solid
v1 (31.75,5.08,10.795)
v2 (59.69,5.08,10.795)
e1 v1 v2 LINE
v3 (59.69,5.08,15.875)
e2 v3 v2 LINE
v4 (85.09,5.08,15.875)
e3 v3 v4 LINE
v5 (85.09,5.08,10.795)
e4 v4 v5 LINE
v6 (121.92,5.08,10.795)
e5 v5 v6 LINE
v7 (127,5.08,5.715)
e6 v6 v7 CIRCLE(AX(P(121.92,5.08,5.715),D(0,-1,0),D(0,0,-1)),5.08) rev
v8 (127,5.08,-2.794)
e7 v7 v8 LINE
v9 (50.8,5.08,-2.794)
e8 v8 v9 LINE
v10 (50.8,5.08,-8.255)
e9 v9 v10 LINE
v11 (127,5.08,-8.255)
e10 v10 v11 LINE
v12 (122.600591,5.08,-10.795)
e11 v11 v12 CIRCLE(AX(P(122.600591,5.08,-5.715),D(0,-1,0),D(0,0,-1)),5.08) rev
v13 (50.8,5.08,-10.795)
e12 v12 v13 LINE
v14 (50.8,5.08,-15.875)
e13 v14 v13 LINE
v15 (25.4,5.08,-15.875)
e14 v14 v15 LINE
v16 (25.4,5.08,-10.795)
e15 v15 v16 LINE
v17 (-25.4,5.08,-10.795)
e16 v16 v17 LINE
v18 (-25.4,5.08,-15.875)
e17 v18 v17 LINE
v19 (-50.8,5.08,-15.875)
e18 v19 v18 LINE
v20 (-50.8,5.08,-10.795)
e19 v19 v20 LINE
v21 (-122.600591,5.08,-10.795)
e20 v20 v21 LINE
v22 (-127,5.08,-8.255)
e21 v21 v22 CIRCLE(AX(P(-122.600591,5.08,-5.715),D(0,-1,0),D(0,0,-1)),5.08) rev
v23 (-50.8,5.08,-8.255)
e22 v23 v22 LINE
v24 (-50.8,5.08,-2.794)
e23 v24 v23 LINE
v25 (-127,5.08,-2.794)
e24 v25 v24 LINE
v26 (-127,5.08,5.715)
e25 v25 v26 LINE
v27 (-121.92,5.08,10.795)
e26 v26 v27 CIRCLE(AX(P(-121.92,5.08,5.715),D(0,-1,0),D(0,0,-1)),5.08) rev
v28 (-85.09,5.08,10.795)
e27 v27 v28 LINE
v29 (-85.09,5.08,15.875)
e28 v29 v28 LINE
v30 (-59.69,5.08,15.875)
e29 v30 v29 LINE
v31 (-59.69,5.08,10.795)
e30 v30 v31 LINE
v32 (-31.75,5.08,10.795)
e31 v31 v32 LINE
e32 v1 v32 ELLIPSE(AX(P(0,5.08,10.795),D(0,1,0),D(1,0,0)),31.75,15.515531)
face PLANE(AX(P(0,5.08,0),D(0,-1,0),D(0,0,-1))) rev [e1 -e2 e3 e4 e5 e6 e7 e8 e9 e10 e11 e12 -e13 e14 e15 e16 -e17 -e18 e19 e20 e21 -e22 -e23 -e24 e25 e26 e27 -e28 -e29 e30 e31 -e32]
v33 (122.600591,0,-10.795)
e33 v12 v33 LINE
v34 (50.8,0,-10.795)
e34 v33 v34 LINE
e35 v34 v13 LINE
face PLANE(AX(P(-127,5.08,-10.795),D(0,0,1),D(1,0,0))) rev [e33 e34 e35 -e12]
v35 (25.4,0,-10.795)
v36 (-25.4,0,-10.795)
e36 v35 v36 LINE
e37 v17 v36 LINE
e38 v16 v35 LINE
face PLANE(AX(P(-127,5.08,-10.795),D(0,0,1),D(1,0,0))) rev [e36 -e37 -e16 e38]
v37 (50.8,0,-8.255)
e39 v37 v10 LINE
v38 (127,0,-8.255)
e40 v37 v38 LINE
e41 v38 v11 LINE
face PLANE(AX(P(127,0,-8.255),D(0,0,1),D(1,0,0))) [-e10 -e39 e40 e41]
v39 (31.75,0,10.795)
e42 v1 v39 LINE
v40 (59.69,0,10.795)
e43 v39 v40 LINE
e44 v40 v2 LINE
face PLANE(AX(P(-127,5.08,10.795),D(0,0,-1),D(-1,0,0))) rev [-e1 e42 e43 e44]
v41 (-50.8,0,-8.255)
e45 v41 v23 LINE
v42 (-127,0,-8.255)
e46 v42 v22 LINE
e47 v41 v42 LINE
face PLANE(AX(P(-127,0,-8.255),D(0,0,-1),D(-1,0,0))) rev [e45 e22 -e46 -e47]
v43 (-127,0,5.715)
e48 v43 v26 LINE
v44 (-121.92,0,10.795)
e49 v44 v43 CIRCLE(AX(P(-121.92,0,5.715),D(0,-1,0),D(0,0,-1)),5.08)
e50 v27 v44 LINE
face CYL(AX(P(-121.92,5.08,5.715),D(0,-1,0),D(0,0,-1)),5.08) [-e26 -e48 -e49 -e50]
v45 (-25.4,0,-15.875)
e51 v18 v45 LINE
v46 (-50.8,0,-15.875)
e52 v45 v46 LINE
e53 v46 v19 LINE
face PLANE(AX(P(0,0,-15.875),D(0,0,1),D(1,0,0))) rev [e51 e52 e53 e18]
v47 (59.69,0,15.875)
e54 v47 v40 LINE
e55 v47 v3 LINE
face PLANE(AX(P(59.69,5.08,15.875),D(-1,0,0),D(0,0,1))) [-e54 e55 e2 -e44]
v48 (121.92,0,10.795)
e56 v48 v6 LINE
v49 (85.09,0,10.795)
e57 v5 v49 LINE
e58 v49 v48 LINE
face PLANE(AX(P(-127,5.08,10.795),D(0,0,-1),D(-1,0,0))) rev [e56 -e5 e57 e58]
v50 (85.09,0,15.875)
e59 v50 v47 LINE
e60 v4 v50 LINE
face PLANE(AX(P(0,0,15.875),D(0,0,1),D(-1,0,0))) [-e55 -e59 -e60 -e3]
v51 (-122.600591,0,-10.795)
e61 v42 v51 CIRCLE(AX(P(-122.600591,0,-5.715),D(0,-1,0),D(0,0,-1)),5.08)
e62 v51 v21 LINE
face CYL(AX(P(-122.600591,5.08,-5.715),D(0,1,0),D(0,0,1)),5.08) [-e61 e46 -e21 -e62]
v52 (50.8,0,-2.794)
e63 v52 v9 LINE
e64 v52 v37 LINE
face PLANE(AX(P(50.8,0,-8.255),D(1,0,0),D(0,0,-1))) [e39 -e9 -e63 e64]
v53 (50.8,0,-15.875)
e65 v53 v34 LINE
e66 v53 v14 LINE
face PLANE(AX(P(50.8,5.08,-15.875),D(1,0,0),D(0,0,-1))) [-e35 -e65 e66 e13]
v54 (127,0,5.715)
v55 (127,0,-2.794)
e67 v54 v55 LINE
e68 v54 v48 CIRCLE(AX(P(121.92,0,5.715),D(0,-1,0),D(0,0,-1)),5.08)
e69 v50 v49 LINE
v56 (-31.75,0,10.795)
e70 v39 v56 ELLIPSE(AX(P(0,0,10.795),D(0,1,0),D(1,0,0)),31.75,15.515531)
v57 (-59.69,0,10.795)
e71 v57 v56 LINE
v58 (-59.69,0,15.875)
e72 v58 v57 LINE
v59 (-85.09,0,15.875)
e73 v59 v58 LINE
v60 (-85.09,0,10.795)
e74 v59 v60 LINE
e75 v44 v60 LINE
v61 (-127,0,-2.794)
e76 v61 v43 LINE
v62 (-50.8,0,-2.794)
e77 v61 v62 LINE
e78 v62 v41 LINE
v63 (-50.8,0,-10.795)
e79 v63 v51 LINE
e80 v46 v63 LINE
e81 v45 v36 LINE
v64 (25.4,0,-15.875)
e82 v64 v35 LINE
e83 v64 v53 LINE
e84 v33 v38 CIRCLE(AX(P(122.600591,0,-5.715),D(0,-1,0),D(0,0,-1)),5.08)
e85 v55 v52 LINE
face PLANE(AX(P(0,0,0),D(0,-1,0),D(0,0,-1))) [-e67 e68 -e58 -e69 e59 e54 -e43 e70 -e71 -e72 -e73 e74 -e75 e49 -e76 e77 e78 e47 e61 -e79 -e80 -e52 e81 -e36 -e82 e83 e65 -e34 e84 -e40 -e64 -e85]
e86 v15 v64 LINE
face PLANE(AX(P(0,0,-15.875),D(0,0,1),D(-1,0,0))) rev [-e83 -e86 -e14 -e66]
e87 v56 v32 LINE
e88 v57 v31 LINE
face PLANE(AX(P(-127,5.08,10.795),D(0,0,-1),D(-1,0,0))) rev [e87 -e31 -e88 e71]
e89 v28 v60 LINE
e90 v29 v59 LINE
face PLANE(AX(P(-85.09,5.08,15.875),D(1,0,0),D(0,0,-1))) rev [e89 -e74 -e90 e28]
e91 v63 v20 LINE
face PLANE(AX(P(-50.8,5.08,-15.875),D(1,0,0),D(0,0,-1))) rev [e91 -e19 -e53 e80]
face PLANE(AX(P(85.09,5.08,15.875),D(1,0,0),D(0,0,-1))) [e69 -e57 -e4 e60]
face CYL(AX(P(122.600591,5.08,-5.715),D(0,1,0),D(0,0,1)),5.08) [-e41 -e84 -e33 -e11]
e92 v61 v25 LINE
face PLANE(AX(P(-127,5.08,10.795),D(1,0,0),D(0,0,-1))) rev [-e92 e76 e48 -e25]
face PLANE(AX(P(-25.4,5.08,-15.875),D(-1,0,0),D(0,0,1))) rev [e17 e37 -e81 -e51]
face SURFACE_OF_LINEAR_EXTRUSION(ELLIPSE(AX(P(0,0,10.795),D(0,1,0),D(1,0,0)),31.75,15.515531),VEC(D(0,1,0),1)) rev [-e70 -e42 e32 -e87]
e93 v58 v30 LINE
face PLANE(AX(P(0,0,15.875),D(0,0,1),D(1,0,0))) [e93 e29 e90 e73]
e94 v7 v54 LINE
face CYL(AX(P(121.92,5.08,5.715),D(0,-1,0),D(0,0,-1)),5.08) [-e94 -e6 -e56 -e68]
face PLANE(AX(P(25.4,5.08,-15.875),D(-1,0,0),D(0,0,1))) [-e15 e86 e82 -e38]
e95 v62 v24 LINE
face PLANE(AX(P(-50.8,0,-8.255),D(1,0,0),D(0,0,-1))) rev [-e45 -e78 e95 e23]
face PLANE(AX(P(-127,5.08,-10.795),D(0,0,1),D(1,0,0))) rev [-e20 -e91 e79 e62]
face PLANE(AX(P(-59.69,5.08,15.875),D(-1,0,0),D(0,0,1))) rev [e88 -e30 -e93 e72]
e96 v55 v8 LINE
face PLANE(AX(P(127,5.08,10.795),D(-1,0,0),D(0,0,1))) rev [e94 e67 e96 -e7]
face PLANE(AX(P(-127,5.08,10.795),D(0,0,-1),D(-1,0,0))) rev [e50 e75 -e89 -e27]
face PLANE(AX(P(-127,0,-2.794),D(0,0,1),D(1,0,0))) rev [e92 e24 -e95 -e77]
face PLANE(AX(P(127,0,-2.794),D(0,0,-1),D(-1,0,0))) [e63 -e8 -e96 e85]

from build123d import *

# Parameters (mm, degrees)
SKETCH1_W            = 254
SKETCH1_H            = 21.59
WALL_BASE_DEPTH      = 5.08
SKETCH2_W            = 25.4
SKETCH2_H            = 5.08
TAB_DEPTH            = 5.08
SKETCH7_W            = 25.4
SKETCH7_H            = 5.08
BOSS_EXTRUDE1_DEPTH  = 5.08
SKETCH3_RX           = 31.75
SKETCH3_RY           = 15.515530829
WHEEL_WELL_CUT_DEPTH = 129.089117512
SKETCH6_W            = 76.2
SKETCH6_H            = 5.461
CUT_EXTRUDE5_DEPTH   = 129.089117627
FILLET2_R            = 5.08


with BuildPart() as part:
    # Sketch1 → Wall-Base (new body)
    with BuildSketch(Plane(origin=(0, 0, 0), x_dir=(1, 0, 0), z_dir=(0, 1, 0))):
        Rectangle(SKETCH1_W, SKETCH1_H)
    extrude(amount=WALL_BASE_DEPTH)

    # Sketch2 → Tab (add)
    with BuildSketch(Plane(origin=(0, 0, -10.795), x_dir=(-1, 0, 0), z_dir=(0, 0, -1))):
        with Locations((38.1, 2.54)):
            Rectangle(SKETCH2_W, SKETCH2_H)
    tab = extrude(amount=TAB_DEPTH)

    # Sketch7 → Boss-Extrude1 (add)
    with BuildSketch(Plane.XY.offset(10.795)):
        with Locations((-72.39, 2.54)):
            Rectangle(SKETCH7_W, SKETCH7_H)
    boss_extrude1 = extrude(amount=BOSS_EXTRUDE1_DEPTH)

    # Mirror1: Tab across plane
    add(tab.mirror(Plane.ZY))

    # Sketch3 → Wheel-Well-Cut (cut, through all)
    with BuildSketch(Plane(origin=(0, 5.08, 0), x_dir=(1, 0, 0), z_dir=(0, 1, 0))):
        with Locations(Location((0, -10.795), (0, 0, 0))):
            Ellipse(SKETCH3_RX, SKETCH3_RY)
    extrude(amount=-WHEEL_WELL_CUT_DEPTH, mode=Mode.SUBTRACT)

    # Sketch6 → Cut-Extrude5 (cut, through all)
    with BuildSketch(Plane(origin=(0, 5.08, 0), x_dir=(1, 0, 0), z_dir=(0, 1, 0))):
        with Locations((-88.9, 5.5245)):
            Rectangle(SKETCH6_W, SKETCH6_H)
    cut_extrude5 = extrude(amount=-CUT_EXTRUDE5_DEPTH, mode=Mode.SUBTRACT)

    # Mirror4: Cut-Extrude5 across plane
    add(cut_extrude5.mirror(Plane.ZY), mode=Mode.SUBTRACT)

    # Fillet2
    # the kernel refuses this fillet: 5.08 mm, written as the material it takes off along each edge
    with BuildSketch(Plane(origin=(127, -12.7, 10.795), x_dir=(0, 0, -1), z_dir=(0, 1, 0)), Plane(origin=(-127, -12.7, 10.795), x_dir=(1, 0, 0), z_dir=(0, 1, 0))) as fillet2_piece_1:
        with BuildLine():
            CenterArc((FILLET2_R, FILLET2_R), FILLET2_R, 180, 90)
            Line((0, FILLET2_R), (-FILLET2_R * 0.02, FILLET2_R))
            Line((-FILLET2_R * 0.02, FILLET2_R), (-FILLET2_R * 0.02, -FILLET2_R * 0.02))
            Line((-FILLET2_R * 0.02, -FILLET2_R * 0.02), (FILLET2_R, -FILLET2_R * 0.02))
            Line((FILLET2_R, -FILLET2_R * 0.02), (FILLET2_R, 0))
        make_face()
    extrude(amount=30.48, mode=Mode.SUBTRACT)
    with BuildSketch(Plane(origin=(-127, -10.998522628, -10.795), x_dir=(0, 0, 1), z_dir=(0, 1, 0))) as fillet2_piece_2:
        with BuildLine():
            CenterArc((5.08, 4.399409051), FILLET2_R, 180, 60)
            Line((0, 4.399409051), (-0.1016, 4.399409051))
            Line((-0.1016, 4.399409051), (-0.1016, 0))
            Line((-0.1016, 0), (0, -0.1016))
            ThreePointArc((0, -0.1016), (1.27, -0.1016), (2.4892, -0.087988181))
            Line((2.4892, -0.087988181), (2.54, 0))
        make_face()
    extrude(amount=27.077045256, mode=Mode.SUBTRACT)
    with BuildSketch(Plane(origin=(127, -10.998522628, -10.795), x_dir=(-1, 0, 0), z_dir=(0, 1, 0))) as fillet2_piece_3:
        with BuildLine():
            CenterArc((4.399409051, 5.08), FILLET2_R, 210, 60)
            Line((0, 2.54), (-0.087988181, 2.4892))
            ThreePointArc((-0.087988181, 2.4892), (-0.1016, 1.27), (-0.1016, 0))
            Line((-0.1016, 0), (0, -0.1016))
            Line((0, -0.1016), (4.399409051, -0.1016))
            Line((4.399409051, -0.1016), (4.399409051, 0))
        make_face()
    extrude(amount=27.077045256, mode=Mode.SUBTRACT)

    # Mirror5: Boss-Extrude1 across plane
    add(boss_extrude1.mirror(Plane.ZY))


solid = part.part
